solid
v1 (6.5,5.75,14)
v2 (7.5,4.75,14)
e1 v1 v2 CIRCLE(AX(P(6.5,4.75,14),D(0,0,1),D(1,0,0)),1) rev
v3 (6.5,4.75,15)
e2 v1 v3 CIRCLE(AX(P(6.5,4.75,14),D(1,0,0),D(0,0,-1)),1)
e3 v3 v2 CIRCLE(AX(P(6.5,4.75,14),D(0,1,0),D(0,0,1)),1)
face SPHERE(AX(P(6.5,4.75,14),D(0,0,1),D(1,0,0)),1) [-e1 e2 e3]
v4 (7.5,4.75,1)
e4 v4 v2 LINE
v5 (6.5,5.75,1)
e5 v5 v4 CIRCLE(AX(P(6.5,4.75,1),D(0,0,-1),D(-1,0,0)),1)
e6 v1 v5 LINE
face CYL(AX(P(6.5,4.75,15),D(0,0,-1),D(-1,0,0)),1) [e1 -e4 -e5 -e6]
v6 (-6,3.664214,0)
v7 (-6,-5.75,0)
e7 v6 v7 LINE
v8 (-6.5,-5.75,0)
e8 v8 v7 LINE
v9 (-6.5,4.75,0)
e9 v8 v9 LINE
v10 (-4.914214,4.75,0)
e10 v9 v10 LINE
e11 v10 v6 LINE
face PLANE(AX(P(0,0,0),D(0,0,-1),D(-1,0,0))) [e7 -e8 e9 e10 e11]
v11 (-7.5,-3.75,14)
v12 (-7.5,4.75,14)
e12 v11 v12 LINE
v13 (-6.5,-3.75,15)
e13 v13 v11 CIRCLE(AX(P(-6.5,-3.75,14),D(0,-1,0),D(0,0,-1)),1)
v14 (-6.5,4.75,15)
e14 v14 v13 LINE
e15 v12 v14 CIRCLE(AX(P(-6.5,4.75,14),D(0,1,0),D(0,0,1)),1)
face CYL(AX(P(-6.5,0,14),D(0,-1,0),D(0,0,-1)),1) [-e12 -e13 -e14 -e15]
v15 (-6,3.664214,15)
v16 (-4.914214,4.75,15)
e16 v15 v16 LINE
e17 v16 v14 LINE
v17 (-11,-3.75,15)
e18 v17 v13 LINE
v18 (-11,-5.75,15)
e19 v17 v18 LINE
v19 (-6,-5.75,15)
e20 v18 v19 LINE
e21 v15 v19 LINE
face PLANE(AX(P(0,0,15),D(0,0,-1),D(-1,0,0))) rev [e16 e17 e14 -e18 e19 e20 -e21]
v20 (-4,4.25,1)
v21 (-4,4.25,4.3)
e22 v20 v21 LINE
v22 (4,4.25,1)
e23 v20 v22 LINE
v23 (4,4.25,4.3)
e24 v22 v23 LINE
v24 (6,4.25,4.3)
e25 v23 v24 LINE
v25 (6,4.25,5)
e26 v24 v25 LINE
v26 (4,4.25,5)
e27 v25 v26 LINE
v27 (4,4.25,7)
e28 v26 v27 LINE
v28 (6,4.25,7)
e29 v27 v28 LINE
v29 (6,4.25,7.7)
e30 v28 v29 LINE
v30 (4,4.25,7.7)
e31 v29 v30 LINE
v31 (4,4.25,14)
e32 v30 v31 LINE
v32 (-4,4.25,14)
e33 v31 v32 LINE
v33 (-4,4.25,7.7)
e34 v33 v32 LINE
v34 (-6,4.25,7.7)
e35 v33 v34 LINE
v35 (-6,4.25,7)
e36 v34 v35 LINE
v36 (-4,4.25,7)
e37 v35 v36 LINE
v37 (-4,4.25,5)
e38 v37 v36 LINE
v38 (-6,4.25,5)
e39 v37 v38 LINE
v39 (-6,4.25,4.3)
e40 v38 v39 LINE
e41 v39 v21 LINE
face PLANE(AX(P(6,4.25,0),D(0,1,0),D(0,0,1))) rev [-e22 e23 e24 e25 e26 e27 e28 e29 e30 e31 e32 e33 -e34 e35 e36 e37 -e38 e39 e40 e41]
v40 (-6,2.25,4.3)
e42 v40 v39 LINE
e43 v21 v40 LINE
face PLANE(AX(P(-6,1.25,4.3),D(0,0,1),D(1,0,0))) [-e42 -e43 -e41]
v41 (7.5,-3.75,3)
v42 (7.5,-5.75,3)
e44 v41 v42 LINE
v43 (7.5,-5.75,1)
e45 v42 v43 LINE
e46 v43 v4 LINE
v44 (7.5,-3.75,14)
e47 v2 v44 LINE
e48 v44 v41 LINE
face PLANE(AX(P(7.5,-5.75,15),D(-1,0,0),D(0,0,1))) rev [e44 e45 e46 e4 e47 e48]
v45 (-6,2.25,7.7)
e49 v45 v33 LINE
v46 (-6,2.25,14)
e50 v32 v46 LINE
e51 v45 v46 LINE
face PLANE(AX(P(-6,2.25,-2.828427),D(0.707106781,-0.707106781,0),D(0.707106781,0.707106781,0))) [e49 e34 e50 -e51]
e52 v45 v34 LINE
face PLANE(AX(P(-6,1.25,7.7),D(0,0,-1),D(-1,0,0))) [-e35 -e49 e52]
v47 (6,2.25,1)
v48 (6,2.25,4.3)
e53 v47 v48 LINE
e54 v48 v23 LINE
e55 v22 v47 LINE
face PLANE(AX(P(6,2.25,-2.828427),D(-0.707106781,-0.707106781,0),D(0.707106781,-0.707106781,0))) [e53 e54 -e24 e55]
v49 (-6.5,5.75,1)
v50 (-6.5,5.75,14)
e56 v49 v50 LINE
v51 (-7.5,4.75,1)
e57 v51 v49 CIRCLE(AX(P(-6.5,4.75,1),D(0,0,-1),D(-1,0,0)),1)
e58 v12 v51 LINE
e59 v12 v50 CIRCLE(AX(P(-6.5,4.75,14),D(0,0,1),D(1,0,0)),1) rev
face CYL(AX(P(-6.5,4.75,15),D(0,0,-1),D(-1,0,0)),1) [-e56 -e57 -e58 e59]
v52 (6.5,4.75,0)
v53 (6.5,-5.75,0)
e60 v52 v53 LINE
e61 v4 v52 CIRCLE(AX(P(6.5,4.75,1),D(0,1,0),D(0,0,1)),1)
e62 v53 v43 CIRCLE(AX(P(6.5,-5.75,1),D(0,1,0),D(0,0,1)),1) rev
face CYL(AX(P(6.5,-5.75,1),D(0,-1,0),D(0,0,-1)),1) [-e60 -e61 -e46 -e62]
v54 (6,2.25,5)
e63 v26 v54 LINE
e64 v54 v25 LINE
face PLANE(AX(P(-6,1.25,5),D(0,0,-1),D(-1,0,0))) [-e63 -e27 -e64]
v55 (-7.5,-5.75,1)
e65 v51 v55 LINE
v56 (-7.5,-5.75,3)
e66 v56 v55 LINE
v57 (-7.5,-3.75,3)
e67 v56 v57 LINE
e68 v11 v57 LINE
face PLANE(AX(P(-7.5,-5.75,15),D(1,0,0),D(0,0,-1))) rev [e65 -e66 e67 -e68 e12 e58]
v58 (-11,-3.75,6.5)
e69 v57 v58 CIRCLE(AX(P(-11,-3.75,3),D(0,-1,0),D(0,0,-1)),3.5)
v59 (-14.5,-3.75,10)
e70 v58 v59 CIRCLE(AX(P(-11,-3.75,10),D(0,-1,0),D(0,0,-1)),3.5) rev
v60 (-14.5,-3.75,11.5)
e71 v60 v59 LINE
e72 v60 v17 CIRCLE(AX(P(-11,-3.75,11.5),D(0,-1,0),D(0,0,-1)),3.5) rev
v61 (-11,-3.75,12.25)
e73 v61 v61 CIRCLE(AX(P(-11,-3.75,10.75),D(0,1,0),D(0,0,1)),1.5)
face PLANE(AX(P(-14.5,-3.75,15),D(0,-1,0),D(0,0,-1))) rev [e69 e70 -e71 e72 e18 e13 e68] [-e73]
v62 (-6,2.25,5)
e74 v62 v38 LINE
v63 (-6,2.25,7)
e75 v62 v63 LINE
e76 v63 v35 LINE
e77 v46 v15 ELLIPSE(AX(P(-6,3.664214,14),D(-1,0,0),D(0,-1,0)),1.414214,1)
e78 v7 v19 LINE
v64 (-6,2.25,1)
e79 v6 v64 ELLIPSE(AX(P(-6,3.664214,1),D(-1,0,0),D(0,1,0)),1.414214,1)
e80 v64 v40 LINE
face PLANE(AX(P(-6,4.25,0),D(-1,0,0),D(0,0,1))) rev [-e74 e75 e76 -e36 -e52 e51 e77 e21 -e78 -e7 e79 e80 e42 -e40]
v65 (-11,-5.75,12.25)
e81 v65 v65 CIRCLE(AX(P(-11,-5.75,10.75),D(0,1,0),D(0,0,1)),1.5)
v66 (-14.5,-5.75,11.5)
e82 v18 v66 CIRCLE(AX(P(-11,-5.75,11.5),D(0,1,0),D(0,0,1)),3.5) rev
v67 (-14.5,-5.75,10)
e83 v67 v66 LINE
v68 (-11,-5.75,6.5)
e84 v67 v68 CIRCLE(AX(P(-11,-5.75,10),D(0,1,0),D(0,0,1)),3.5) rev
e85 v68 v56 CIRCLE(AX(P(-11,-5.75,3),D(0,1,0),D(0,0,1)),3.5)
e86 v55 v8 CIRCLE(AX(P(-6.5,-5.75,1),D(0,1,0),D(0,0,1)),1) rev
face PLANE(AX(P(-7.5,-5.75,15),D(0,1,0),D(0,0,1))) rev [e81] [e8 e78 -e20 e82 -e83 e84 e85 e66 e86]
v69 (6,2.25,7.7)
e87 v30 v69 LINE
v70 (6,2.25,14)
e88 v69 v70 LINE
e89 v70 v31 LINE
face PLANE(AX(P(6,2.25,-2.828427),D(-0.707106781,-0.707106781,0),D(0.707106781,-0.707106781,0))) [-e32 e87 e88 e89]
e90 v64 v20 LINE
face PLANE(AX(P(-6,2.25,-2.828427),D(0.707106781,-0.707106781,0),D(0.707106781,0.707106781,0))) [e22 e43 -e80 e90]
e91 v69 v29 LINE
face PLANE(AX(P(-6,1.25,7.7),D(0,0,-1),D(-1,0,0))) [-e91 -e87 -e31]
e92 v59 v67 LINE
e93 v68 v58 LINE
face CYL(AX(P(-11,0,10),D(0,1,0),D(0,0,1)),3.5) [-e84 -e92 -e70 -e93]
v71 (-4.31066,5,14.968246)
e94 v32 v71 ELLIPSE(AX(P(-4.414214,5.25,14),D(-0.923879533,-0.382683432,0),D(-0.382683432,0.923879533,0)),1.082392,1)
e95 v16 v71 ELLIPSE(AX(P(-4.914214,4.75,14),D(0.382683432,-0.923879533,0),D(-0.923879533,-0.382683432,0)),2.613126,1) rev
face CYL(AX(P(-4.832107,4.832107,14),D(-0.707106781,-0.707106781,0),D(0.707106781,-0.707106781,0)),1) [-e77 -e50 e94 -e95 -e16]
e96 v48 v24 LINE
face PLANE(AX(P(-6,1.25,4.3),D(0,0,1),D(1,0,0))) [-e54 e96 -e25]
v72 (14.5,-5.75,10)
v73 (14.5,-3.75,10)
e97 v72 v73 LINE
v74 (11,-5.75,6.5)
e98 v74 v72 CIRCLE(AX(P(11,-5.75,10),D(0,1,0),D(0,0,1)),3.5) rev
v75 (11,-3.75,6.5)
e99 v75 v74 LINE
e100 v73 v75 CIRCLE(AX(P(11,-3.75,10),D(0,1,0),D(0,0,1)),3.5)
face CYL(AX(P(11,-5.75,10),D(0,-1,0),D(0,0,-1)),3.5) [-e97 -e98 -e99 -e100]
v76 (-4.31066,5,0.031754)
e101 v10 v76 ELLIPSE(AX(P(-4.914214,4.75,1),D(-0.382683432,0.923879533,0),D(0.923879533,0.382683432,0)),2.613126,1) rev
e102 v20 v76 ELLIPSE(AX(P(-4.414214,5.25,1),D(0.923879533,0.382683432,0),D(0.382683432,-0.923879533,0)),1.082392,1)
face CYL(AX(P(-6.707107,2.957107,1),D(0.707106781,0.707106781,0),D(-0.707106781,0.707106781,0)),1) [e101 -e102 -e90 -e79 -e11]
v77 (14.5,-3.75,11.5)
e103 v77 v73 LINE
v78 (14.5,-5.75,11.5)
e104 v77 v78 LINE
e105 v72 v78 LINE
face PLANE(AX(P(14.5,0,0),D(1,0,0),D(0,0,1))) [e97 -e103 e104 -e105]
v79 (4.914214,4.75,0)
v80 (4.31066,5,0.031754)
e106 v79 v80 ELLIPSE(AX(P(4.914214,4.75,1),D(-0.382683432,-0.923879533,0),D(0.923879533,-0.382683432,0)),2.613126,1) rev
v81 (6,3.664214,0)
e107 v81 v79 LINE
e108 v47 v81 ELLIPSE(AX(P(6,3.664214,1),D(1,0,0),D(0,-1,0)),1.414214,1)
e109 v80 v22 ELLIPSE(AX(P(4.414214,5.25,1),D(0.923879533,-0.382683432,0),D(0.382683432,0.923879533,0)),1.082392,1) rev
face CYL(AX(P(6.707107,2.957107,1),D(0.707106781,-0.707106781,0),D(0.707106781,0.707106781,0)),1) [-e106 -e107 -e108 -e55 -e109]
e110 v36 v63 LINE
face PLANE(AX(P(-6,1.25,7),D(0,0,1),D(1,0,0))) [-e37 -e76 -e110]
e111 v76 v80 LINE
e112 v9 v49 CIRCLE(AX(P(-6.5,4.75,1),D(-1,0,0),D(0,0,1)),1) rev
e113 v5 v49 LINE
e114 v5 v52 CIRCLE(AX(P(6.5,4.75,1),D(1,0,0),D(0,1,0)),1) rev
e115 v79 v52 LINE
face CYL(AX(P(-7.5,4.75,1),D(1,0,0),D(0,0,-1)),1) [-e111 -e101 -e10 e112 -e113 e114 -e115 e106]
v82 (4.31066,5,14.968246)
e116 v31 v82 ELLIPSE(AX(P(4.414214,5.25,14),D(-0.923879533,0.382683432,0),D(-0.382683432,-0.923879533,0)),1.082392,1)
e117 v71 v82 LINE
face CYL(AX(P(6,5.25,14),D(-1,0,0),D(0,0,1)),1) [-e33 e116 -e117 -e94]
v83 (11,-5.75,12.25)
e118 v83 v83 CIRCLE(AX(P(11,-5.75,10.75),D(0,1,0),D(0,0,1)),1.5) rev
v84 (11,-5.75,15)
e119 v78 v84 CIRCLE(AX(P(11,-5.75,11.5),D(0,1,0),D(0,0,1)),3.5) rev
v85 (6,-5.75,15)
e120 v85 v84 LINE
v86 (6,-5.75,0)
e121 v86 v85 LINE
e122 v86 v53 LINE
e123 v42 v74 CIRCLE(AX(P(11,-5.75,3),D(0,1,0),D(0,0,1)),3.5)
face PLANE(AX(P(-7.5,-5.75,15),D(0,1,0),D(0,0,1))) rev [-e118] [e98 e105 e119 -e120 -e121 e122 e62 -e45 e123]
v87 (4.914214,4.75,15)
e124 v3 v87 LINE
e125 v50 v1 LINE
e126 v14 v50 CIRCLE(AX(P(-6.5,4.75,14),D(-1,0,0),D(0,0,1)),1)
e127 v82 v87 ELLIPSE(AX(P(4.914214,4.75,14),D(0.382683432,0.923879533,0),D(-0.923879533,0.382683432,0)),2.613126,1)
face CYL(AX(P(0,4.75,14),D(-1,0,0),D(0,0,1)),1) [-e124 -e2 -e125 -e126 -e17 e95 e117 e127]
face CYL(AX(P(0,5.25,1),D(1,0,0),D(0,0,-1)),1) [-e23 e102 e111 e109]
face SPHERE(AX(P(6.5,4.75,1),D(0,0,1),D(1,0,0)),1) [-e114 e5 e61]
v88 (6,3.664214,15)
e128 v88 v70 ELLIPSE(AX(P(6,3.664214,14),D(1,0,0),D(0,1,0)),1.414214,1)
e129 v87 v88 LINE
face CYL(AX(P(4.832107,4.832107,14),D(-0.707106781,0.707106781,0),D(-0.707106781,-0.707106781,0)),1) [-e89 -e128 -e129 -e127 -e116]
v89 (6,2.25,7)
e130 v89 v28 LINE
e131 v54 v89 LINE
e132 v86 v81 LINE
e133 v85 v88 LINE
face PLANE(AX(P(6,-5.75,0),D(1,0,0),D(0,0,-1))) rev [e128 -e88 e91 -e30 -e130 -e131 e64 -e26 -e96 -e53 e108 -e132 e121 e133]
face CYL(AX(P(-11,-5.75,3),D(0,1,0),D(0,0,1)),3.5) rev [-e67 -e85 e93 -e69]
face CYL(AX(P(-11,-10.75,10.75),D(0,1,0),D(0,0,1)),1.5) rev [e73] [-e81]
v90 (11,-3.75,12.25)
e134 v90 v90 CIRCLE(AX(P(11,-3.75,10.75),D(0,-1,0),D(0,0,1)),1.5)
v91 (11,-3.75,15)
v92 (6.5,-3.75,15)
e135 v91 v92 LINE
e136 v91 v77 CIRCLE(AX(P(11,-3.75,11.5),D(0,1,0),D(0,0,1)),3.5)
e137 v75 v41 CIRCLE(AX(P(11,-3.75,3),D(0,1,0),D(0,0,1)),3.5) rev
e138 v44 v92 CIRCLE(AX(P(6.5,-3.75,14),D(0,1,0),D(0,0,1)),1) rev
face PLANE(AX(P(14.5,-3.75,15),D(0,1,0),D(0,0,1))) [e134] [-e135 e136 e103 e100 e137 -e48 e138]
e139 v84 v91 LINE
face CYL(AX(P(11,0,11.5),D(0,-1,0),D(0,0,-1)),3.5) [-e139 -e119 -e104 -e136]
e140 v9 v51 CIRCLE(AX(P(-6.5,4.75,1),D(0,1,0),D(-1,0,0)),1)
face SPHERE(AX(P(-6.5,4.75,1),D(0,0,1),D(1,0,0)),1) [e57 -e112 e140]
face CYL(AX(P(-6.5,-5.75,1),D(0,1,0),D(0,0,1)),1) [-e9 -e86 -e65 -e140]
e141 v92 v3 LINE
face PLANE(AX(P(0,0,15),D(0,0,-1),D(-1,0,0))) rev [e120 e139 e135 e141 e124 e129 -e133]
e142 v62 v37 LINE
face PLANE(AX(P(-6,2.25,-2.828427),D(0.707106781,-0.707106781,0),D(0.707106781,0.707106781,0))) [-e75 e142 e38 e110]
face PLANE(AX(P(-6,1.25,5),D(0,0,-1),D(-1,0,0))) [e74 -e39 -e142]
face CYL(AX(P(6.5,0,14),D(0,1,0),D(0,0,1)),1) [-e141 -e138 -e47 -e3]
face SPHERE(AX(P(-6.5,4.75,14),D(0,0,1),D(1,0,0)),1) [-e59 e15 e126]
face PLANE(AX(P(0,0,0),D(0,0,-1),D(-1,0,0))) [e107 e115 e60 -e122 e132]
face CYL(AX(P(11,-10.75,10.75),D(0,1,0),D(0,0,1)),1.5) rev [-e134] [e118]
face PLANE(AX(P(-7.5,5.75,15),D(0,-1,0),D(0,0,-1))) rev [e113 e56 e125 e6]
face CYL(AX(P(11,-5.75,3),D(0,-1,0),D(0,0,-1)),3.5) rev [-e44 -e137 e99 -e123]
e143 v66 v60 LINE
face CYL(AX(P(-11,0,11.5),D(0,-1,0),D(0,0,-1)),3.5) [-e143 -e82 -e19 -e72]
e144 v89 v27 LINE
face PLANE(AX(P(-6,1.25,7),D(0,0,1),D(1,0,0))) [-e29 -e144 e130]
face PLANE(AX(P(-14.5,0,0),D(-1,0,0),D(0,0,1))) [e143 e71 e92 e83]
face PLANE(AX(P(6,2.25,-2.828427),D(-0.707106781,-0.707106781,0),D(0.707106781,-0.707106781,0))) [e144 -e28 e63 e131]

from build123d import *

# Parameters (mm, degrees)
SKETCH2_W           = 15
SKETCH2_H           = 11.5
BOSS_EXTRUDE1_DEPTH = 15
SKETCH3_W           = 12
SKETCH3_H           = 10
CUT_EXTRUDE1_DEPTH  = 15
SKETCH4_W           = 8.5
SKETCH4_H           = 2
BOSS_EXTRUDE2_DEPTH = 7
SKETCH5_R           = 1.5
CUT_EXTRUDE2_DEPTH  = 7
BOSS_EXTRUDE3_DEPTH = 15
SKETCH7_W           = 12
SKETCH7_H           = 0.7
CUT_EXTRUDE3_DEPTH  = 3
FILLET2_R           = 3.5
FILLET3_R           = 1


# Some blends are built 0.0001 mm under size
with BuildPart() as part:
    # Sketch2 → Boss-Extrude1 (new body)
    with BuildSketch(Plane.XY):
        Rectangle(SKETCH2_W, SKETCH2_H)
    extrude(amount=BOSS_EXTRUDE1_DEPTH)

    # Sketch3 → Cut-Extrude1 (cut)
    with BuildSketch(Plane.XY.offset(15)):
        with Locations((0, -0.75)):
            Rectangle(SKETCH3_W, SKETCH3_H)
    extrude(amount=-CUT_EXTRUDE1_DEPTH, mode=Mode.SUBTRACT)

    # Sketch4 → Boss-Extrude2 (add)
    with BuildSketch(Plane.ZY.offset(7.5)):
        with Locations((10.75, -4.75)):
            Rectangle(SKETCH4_W, SKETCH4_H)
    boss_extrude2 = extrude(amount=BOSS_EXTRUDE2_DEPTH)

    # Sketch5 → Cut-Extrude2 (cut)
    with BuildSketch(Plane(origin=(0, -3.75, 0), x_dir=(1, 0, 0), z_dir=(0, 1, 0))):
        with Locations(Location((-11, -10.75, 0), (0, 0, 270))):
            Circle(SKETCH5_R)
    cut_extrude2 = extrude(amount=-CUT_EXTRUDE2_DEPTH, mode=Mode.SUBTRACT)

    # Mirror3: Boss-Extrude2, Cut-Extrude2 across plane
    add(boss_extrude2.mirror(Plane(origin=(0, 0, 0), x_dir=(0, 0, 1), z_dir=(1, 0, 0))))
    add(cut_extrude2.mirror(Plane(origin=(0, 0, 0), x_dir=(0, 0, 1), z_dir=(1, 0, 0))), mode=Mode.SUBTRACT)

    # Sketch6 → Boss-Extrude3 (add)
    with BuildSketch(Plane.XY.offset(15)):
        Polygon((-6, 2.25), (-4, 4.25), (-6, 4.25), align=None)
        Polygon((4, 4.25), (6, 4.25), (6, 2.25), align=None)
    extrude(amount=-BOSS_EXTRUDE3_DEPTH)

    # Sketch7 → Cut-Extrude3 (cut)
    with BuildSketch(Plane.XZ.offset(-4.25)):
        with Locations((0, 4.65)):
            Rectangle(SKETCH7_W, SKETCH7_H)
        with Locations((0, 7.35)):
            Rectangle(SKETCH7_W, SKETCH7_H)
    extrude(amount=CUT_EXTRUDE3_DEPTH, mode=Mode.SUBTRACT)

    # Fillet2
    fillet2_edges = [part.edges().sort_by_distance(p)[0] for p in [
        (-7.5, -4.75, 6.5),
        (7.5, -4.75, 6.5),
        (14.5, -4.75, 15),
        (14.5, -4.75, 6.5),
        (-14.5, -4.75, 15),
        (-14.5, -4.75, 6.5),
    ]]
    fillet(fillet2_edges, radius=FILLET2_R - 0.0001)  # a hair under: the kernel refuses the full size

    # Fillet3
    # the kernel refuses this fillet: 1 mm, written as the material it takes off along each edge
    with BuildSketch(Plane(origin=(-6.5, 4.75, 14), x_dir=(0, 0, 1), z_dir=(-1, 0, 0))) as fillet3_piece_1_section:
        Polygon((0, 0), (FILLET3_R, 0), (FILLET3_R, FILLET3_R), (0, FILLET3_R), align=None)
    fillet3_piece_1 = extrude(amount=FILLET3_R, mode=Mode.PRIVATE)
    fillet3_piece_1 = fillet3_piece_1 - Plane(origin=(-6.5, 4.75, 14), x_dir=(0, -0.7071067811865475, -0.7071067811865475), z_dir=(-1, 0, 0)) * Sphere(FILLET3_R, mode=Mode.PRIVATE)
    add(fillet3_piece_1, mode=Mode.SUBTRACT)
    with BuildSketch(Plane(origin=(6.5, 4.75, 14), x_dir=(1, 0, 0), z_dir=(0, 0, 1))) as fillet3_piece_2_section:
        Polygon((0, 0), (FILLET3_R, 0), (FILLET3_R, FILLET3_R), (0, FILLET3_R), align=None)
    fillet3_piece_2 = extrude(amount=FILLET3_R, mode=Mode.PRIVATE)
    fillet3_piece_2 = fillet3_piece_2 - Plane(origin=(6.5, 4.75, 14), x_dir=(-0.7071067811865475, -0.7071067811865475, 0), z_dir=(0, 0, 1)) * Sphere(FILLET3_R, mode=Mode.PRIVATE)
    add(fillet3_piece_2, mode=Mode.SUBTRACT)
    with BuildSketch(Plane(origin=(-6.5, 4.75, 1), x_dir=(-1, 0, 0), z_dir=(0, 0, -1))) as fillet3_piece_3_section:
        Polygon((0, 0), (FILLET3_R, 0), (FILLET3_R, FILLET3_R), (0, FILLET3_R), align=None)
    fillet3_piece_3 = extrude(amount=FILLET3_R, mode=Mode.PRIVATE)
    fillet3_piece_3 = fillet3_piece_3 - Plane(origin=(-6.5, 4.75, 1), x_dir=(0.7071067811865475, -0.7071067811865475, 0), z_dir=(0, 0, -1)) * Sphere(FILLET3_R, mode=Mode.PRIVATE)
    add(fillet3_piece_3, mode=Mode.SUBTRACT)
    with BuildSketch(Plane(origin=(6.5, 4.75, 1), x_dir=(1, 0, 0), z_dir=(0, 0, -1))) as fillet3_piece_4_section:
        Polygon((0, 0), (FILLET3_R, 0), (FILLET3_R, -FILLET3_R), (0, -FILLET3_R), align=None)
    fillet3_piece_4 = extrude(amount=FILLET3_R, mode=Mode.PRIVATE)
    fillet3_piece_4 = fillet3_piece_4 - Plane(origin=(6.5, 4.75, 1), x_dir=(-0.7071067811865475, -0.7071067811865475, 0), z_dir=(0, 0, -1)) * Sphere(FILLET3_R, mode=Mode.PRIVATE)
    add(fillet3_piece_4, mode=Mode.SUBTRACT)
    with BuildSketch(Plane(origin=(-7.5, 4.75, 15), x_dir=(1, 0, 0), z_dir=(0, -1, 0)), Plane(origin=(7.5, -3.75, 15), x_dir=(-1, 0, 0), z_dir=(0, 1, 0))) as fillet3_piece_5:
        with BuildLine():
            CenterArc((FILLET3_R, -FILLET3_R), FILLET3_R, 90, 90)
            Line((0, -FILLET3_R), (0, 0))
            Line((0, 0), (FILLET3_R, 0))
        make_face()
    extrude(amount=8.5, mode=Mode.SUBTRACT)
    with BuildSketch(Plane(origin=(-7.5, 4.75, 0), x_dir=(1, 0, 0), z_dir=(0, -1, 0))) as fillet3_piece_6:
        with BuildLine():
            CenterArc((FILLET3_R, FILLET3_R), FILLET3_R, 180, 90)
            Line((0, FILLET3_R), (0, 0))
            Line((0, 0), (FILLET3_R, 0))
        make_face()
    extrude(amount=13, mode=Mode.SUBTRACT)
    with BuildSketch(Plane(origin=(6.5, 5.75, 0), x_dir=(0, 0, 1), z_dir=(-1, 0, 0)), Plane(origin=(7.5, -8.25, 0), x_dir=(0, 0, 1), z_dir=(0, 1, 0)), Plane(origin=(-7.5, 5.75, 1), x_dir=(1, 0, 0), z_dir=(0, 0, 1)), Plane(origin=(7.5, 5.75, 1), x_dir=(0, -1, 0), z_dir=(0, 0, 1)), Plane(origin=(6.5, 5.75, 15), x_dir=(0, -1, 0), z_dir=(-1, 0, 0))) as fillet3_piece_7:
        with BuildLine():
            CenterArc((FILLET3_R, -FILLET3_R), FILLET3_R, 90, 90)
            Line((0, -FILLET3_R), (0, 0))
            Line((0, 0), (FILLET3_R, 0))
        make_face()
    extrude(amount=13, mode=Mode.SUBTRACT)
    with BuildSketch(Plane(origin=(-7.767766953, 0.482233047, 15), x_dir=(-0.7071067811865476, 0.7071067811865477, 0), z_dir=(0.7071067811865476, 0.7071067811865475, 0))) as fillet3_piece_8_section:
        with BuildLine():
            CenterArc((FILLET3_R, -FILLET3_R), FILLET3_R, 90, 90)
            Line((0, -FILLET3_R), (0, 0))
            Line((0, 0), (FILLET3_R, 0))
        make_face()
    fillet3_piece_8 = extrude(amount=7.828427125, mode=Mode.PRIVATE)
    fillet3_piece_8 = split(fillet3_piece_8, bisect_by=Plane(origin=(-5.132418039, 4.25, 14.750489644), z_dir=(0, -1, 0)), keep=Keep.TOP, mode=Mode.PRIVATE)
    fillet3_piece_8 = split(fillet3_piece_8, bisect_by=Plane(origin=(-6, 3.382418039, 14.750489644), z_dir=(1, 0, 0)), keep=Keep.TOP, mode=Mode.PRIVATE)
    add(fillet3_piece_8, mode=Mode.SUBTRACT)
    with BuildSketch(Plane(origin=(-7.767766953, 0.482233047, 0), x_dir=(0, 0, 1), z_dir=(0.7071067811865476, 0.7071067811865475, 0))) as fillet3_piece_9_section:
        with BuildLine():
            CenterArc((FILLET3_R, -FILLET3_R), FILLET3_R, 90, 90)
            Line((0, -FILLET3_R), (0, 0))
            Line((0, 0), (FILLET3_R, 0))
        make_face()
    fillet3_piece_9 = extrude(amount=7.828427125, mode=Mode.PRIVATE)
    fillet3_piece_9 = split(fillet3_piece_9, bisect_by=Plane(origin=(-5.132418039, 4.25, 0.249510356), z_dir=(0, -1, 0)), keep=Keep.TOP, mode=Mode.PRIVATE)
    fillet3_piece_9 = split(fillet3_piece_9, bisect_by=Plane(origin=(-6, 3.382418039, 0.249510356), z_dir=(1, 0, 0)), keep=Keep.TOP, mode=Mode.PRIVATE)
    add(fillet3_piece_9, mode=Mode.SUBTRACT)
    with BuildSketch(Plane(origin=(6.5, 4.25, 15), x_dir=(0, 1, 0), z_dir=(-1, 0, 0))) as fillet3_piece_10_section:
        with BuildLine():
            CenterArc((FILLET3_R, FILLET3_R), FILLET3_R, 180, 90)
            Line((0, FILLET3_R), (0, 0))
            Line((0, 0), (FILLET3_R, 0))
        make_face()
    fillet3_piece_10 = extrude(amount=13, mode=Mode.PRIVATE)
    fillet3_piece_10 = split(fillet3_piece_10, bisect_by=Plane(origin=(1.892960565, 6.357039435, 14.766328896), z_dir=(-0.7071067811865475, -0.7071067811865476, 0)), keep=Keep.TOP, mode=Mode.PRIVATE)
    fillet3_piece_10 = split(fillet3_piece_10, bisect_by=Plane(origin=(-1.892960565, 6.357039435, 14.766328896), z_dir=(0.7071067811865475, -0.7071067811865476, 0)), keep=Keep.TOP, mode=Mode.PRIVATE)
    add(fillet3_piece_10, mode=Mode.SUBTRACT)
    with BuildSketch(Plane(origin=(6.5, 4.25, 0), x_dir=(0, 0, 1), z_dir=(-1, 0, 0))) as fillet3_piece_11_section:
        with BuildLine():
            CenterArc((FILLET3_R, FILLET3_R), FILLET3_R, 180, 90)
            Line((0, FILLET3_R), (0, 0))
            Line((0, 0), (FILLET3_R, 0))
        make_face()
    fillet3_piece_11 = extrude(amount=13, mode=Mode.PRIVATE)
    fillet3_piece_11 = split(fillet3_piece_11, bisect_by=Plane(origin=(1.892960565, 6.357039435, 0.233671104), z_dir=(-0.7071067811865475, -0.7071067811865476, 0)), keep=Keep.TOP, mode=Mode.PRIVATE)
    fillet3_piece_11 = split(fillet3_piece_11, bisect_by=Plane(origin=(-1.892960565, 6.357039435, 0.233671104), z_dir=(0.7071067811865475, -0.7071067811865476, 0)), keep=Keep.TOP, mode=Mode.PRIVATE)
    add(fillet3_piece_11, mode=Mode.SUBTRACT)
    with BuildSketch(Plane(origin=(7.767766953, 0.482233047, 15), x_dir=(0.7071067811865476, 0.7071067811865477, 0), z_dir=(-0.7071067811865476, 0.7071067811865475, 0))) as fillet3_piece_12_section:
        with BuildLine():
            CenterArc((FILLET3_R, FILLET3_R), FILLET3_R, 180, 90)
            Line((0, FILLET3_R), (0, 0))
            Line((0, 0), (FILLET3_R, 0))
        make_face()
    fillet3_piece_12 = extrude(amount=7.828427125, mode=Mode.PRIVATE)
    fillet3_piece_12 = split(fillet3_piece_12, bisect_by=Plane(origin=(6, 3.382418039, 14.750489644), z_dir=(-1, 0, 0)), keep=Keep.TOP, mode=Mode.PRIVATE)
    fillet3_piece_12 = split(fillet3_piece_12, bisect_by=Plane(origin=(5.132418039, 4.25, 14.750489644), z_dir=(0, -1, 0)), keep=Keep.TOP, mode=Mode.PRIVATE)
    add(fillet3_piece_12, mode=Mode.SUBTRACT)
    with BuildSketch(Plane(origin=(7.767766953, 0.482233047, 0), x_dir=(0, 0, 1), z_dir=(-0.7071067811865476, 0.7071067811865475, 0))) as fillet3_piece_13_section:
        with BuildLine():
            CenterArc((FILLET3_R, FILLET3_R), FILLET3_R, 180, 90)
            Line((0, FILLET3_R), (0, 0))
            Line((0, 0), (FILLET3_R, 0))
        make_face()
    fillet3_piece_13 = extrude(amount=7.828427125, mode=Mode.PRIVATE)
    fillet3_piece_13 = split(fillet3_piece_13, bisect_by=Plane(origin=(6, 3.382418039, 0.249510356), z_dir=(-1, 0, 0)), keep=Keep.TOP, mode=Mode.PRIVATE)
    fillet3_piece_13 = split(fillet3_piece_13, bisect_by=Plane(origin=(5.132418039, 4.25, 0.249510356), z_dir=(0, -1, 0)), keep=Keep.TOP, mode=Mode.PRIVATE)
    add(fillet3_piece_13, mode=Mode.SUBTRACT)
    with BuildSketch(Plane(origin=(-7.767766953, 0.482233047, 15), x_dir=(-0.7071067811865476, 0.7071067811865477, 0), z_dir=(0.7071067811865476, 0.7071067811865475, 0))) as fillet3_piece_14a_section:
        with BuildLine():
            CenterArc((FILLET3_R, -FILLET3_R), FILLET3_R, 90, 90)
            Line((0, -FILLET3_R), (0, 0))
            Line((0, 0), (FILLET3_R, 0))
        make_face()
    fillet3_piece_14a = extrude(amount=7.828427125, mode=Mode.PRIVATE)
    fillet3_piece_14a = split(fillet3_piece_14a, bisect_by=Plane(origin=(-3.374325792, 4.25, 14.783675587), z_dir=(0, 1, 0)), keep=Keep.TOP, mode=Mode.PRIVATE)
    with BuildSketch(Plane(origin=(6.5, 4.25, 15), x_dir=(0, 1, 0), z_dir=(-1, 0, 0))) as fillet3_piece_14b_section:
        with BuildLine():
            CenterArc((FILLET3_R, FILLET3_R), FILLET3_R, 180, 90)
            Line((0, FILLET3_R), (0, 0))
            Line((0, 0), (FILLET3_R, 0))
        make_face()
    fillet3_piece_14b = extrude(amount=13, mode=Mode.PRIVATE)
    fillet3_piece_14b = split(fillet3_piece_14b, bisect_by=Plane(origin=(-4.442418475, 3.807581525, 14.783675587), z_dir=(-0.7071067811865475, 0.7071067811865476, 0)), keep=Keep.TOP, mode=Mode.PRIVATE)
    fillet3_piece_14 = fillet3_piece_14a & fillet3_piece_14b
    add(fillet3_piece_14, mode=Mode.SUBTRACT)
    with BuildSketch(Plane(origin=(6.5, 4.25, 0), x_dir=(0, 0, 1), z_dir=(-1, 0, 0))) as fillet3_piece_15a_section:
        with BuildLine():
            CenterArc((FILLET3_R, FILLET3_R), FILLET3_R, 180, 90)
            Line((0, FILLET3_R), (0, 0))
            Line((0, 0), (FILLET3_R, 0))
        make_face()
    fillet3_piece_15a = extrude(amount=13, mode=Mode.PRIVATE)
    fillet3_piece_15a = split(fillet3_piece_15a, bisect_by=Plane(origin=(-4.442418475, 3.807581525, 0.216324413), z_dir=(-0.7071067811865475, 0.7071067811865476, 0)), keep=Keep.TOP, mode=Mode.PRIVATE)
    with BuildSketch(Plane(origin=(-7.767766953, 0.482233047, 0), x_dir=(0, 0, 1), z_dir=(0.7071067811865476, 0.7071067811865475, 0))) as fillet3_piece_15b_section:
        with BuildLine():
            CenterArc((FILLET3_R, -FILLET3_R), FILLET3_R, 90, 90)
            Line((0, -FILLET3_R), (0, 0))
            Line((0, 0), (FILLET3_R, 0))
        make_face()
    fillet3_piece_15b = extrude(amount=7.828427125, mode=Mode.PRIVATE)
    fillet3_piece_15b = split(fillet3_piece_15b, bisect_by=Plane(origin=(-3.374325792, 4.25, 0.216324413), z_dir=(0, 1, 0)), keep=Keep.TOP, mode=Mode.PRIVATE)
    fillet3_piece_15 = fillet3_piece_15a & fillet3_piece_15b
    add(fillet3_piece_15, mode=Mode.SUBTRACT)
    with BuildSketch(Plane(origin=(6.5, 4.25, 15), x_dir=(0, 1, 0), z_dir=(-1, 0, 0))) as fillet3_piece_16a_section:
        with BuildLine():
            CenterArc((FILLET3_R, FILLET3_R), FILLET3_R, 180, 90)
            Line((0, FILLET3_R), (0, 0))
            Line((0, 0), (FILLET3_R, 0))
        make_face()
    fillet3_piece_16a = extrude(amount=13, mode=Mode.PRIVATE)
    fillet3_piece_16a = split(fillet3_piece_16a, bisect_by=Plane(origin=(4.442418475, 3.807581525, 14.783675587), z_dir=(0.7071067811865475, 0.7071067811865476, 0)), keep=Keep.TOP, mode=Mode.PRIVATE)
    with BuildSketch(Plane(origin=(7.767766953, 0.482233047, 15), x_dir=(0.7071067811865476, 0.7071067811865477, 0), z_dir=(-0.7071067811865476, 0.7071067811865475, 0))) as fillet3_piece_16b_section:
        with BuildLine():
            CenterArc((FILLET3_R, FILLET3_R), FILLET3_R, 180, 90)
            Line((0, FILLET3_R), (0, 0))
            Line((0, 0), (FILLET3_R, 0))
        make_face()
    fillet3_piece_16b = extrude(amount=7.828427125, mode=Mode.PRIVATE)
    fillet3_piece_16b = split(fillet3_piece_16b, bisect_by=Plane(origin=(3.374325792, 4.25, 14.783675587), z_dir=(0, 1, 0)), keep=Keep.TOP, mode=Mode.PRIVATE)
    fillet3_piece_16 = fillet3_piece_16a & fillet3_piece_16b
    add(fillet3_piece_16, mode=Mode.SUBTRACT)
    with BuildSketch(Plane(origin=(7.767766953, 0.482233047, 0), x_dir=(0, 0, 1), z_dir=(-0.7071067811865476, 0.7071067811865475, 0))) as fillet3_piece_17a_section:
        with BuildLine():
            CenterArc((FILLET3_R, FILLET3_R), FILLET3_R, 180, 90)
            Line((0, FILLET3_R), (0, 0))
            Line((0, 0), (FILLET3_R, 0))
        make_face()
    fillet3_piece_17a = extrude(amount=7.828427125, mode=Mode.PRIVATE)
    fillet3_piece_17a = split(fillet3_piece_17a, bisect_by=Plane(origin=(3.374325792, 4.25, 0.216324413), z_dir=(0, 1, 0)), keep=Keep.TOP, mode=Mode.PRIVATE)
    with BuildSketch(Plane(origin=(6.5, 4.25, 0), x_dir=(0, 0, 1), z_dir=(-1, 0, 0))) as fillet3_piece_17b_section:
        with BuildLine():
            CenterArc((FILLET3_R, FILLET3_R), FILLET3_R, 180, 90)
            Line((0, FILLET3_R), (0, 0))
            Line((0, 0), (FILLET3_R, 0))
        make_face()
    fillet3_piece_17b = extrude(amount=13, mode=Mode.PRIVATE)
    fillet3_piece_17b = split(fillet3_piece_17b, bisect_by=Plane(origin=(4.442418475, 3.807581525, 0.216324413), z_dir=(0.7071067811865475, 0.7071067811865476, 0)), keep=Keep.TOP, mode=Mode.PRIVATE)
    fillet3_piece_17 = fillet3_piece_17a & fillet3_piece_17b
    add(fillet3_piece_17, mode=Mode.SUBTRACT)


solid = part.part
